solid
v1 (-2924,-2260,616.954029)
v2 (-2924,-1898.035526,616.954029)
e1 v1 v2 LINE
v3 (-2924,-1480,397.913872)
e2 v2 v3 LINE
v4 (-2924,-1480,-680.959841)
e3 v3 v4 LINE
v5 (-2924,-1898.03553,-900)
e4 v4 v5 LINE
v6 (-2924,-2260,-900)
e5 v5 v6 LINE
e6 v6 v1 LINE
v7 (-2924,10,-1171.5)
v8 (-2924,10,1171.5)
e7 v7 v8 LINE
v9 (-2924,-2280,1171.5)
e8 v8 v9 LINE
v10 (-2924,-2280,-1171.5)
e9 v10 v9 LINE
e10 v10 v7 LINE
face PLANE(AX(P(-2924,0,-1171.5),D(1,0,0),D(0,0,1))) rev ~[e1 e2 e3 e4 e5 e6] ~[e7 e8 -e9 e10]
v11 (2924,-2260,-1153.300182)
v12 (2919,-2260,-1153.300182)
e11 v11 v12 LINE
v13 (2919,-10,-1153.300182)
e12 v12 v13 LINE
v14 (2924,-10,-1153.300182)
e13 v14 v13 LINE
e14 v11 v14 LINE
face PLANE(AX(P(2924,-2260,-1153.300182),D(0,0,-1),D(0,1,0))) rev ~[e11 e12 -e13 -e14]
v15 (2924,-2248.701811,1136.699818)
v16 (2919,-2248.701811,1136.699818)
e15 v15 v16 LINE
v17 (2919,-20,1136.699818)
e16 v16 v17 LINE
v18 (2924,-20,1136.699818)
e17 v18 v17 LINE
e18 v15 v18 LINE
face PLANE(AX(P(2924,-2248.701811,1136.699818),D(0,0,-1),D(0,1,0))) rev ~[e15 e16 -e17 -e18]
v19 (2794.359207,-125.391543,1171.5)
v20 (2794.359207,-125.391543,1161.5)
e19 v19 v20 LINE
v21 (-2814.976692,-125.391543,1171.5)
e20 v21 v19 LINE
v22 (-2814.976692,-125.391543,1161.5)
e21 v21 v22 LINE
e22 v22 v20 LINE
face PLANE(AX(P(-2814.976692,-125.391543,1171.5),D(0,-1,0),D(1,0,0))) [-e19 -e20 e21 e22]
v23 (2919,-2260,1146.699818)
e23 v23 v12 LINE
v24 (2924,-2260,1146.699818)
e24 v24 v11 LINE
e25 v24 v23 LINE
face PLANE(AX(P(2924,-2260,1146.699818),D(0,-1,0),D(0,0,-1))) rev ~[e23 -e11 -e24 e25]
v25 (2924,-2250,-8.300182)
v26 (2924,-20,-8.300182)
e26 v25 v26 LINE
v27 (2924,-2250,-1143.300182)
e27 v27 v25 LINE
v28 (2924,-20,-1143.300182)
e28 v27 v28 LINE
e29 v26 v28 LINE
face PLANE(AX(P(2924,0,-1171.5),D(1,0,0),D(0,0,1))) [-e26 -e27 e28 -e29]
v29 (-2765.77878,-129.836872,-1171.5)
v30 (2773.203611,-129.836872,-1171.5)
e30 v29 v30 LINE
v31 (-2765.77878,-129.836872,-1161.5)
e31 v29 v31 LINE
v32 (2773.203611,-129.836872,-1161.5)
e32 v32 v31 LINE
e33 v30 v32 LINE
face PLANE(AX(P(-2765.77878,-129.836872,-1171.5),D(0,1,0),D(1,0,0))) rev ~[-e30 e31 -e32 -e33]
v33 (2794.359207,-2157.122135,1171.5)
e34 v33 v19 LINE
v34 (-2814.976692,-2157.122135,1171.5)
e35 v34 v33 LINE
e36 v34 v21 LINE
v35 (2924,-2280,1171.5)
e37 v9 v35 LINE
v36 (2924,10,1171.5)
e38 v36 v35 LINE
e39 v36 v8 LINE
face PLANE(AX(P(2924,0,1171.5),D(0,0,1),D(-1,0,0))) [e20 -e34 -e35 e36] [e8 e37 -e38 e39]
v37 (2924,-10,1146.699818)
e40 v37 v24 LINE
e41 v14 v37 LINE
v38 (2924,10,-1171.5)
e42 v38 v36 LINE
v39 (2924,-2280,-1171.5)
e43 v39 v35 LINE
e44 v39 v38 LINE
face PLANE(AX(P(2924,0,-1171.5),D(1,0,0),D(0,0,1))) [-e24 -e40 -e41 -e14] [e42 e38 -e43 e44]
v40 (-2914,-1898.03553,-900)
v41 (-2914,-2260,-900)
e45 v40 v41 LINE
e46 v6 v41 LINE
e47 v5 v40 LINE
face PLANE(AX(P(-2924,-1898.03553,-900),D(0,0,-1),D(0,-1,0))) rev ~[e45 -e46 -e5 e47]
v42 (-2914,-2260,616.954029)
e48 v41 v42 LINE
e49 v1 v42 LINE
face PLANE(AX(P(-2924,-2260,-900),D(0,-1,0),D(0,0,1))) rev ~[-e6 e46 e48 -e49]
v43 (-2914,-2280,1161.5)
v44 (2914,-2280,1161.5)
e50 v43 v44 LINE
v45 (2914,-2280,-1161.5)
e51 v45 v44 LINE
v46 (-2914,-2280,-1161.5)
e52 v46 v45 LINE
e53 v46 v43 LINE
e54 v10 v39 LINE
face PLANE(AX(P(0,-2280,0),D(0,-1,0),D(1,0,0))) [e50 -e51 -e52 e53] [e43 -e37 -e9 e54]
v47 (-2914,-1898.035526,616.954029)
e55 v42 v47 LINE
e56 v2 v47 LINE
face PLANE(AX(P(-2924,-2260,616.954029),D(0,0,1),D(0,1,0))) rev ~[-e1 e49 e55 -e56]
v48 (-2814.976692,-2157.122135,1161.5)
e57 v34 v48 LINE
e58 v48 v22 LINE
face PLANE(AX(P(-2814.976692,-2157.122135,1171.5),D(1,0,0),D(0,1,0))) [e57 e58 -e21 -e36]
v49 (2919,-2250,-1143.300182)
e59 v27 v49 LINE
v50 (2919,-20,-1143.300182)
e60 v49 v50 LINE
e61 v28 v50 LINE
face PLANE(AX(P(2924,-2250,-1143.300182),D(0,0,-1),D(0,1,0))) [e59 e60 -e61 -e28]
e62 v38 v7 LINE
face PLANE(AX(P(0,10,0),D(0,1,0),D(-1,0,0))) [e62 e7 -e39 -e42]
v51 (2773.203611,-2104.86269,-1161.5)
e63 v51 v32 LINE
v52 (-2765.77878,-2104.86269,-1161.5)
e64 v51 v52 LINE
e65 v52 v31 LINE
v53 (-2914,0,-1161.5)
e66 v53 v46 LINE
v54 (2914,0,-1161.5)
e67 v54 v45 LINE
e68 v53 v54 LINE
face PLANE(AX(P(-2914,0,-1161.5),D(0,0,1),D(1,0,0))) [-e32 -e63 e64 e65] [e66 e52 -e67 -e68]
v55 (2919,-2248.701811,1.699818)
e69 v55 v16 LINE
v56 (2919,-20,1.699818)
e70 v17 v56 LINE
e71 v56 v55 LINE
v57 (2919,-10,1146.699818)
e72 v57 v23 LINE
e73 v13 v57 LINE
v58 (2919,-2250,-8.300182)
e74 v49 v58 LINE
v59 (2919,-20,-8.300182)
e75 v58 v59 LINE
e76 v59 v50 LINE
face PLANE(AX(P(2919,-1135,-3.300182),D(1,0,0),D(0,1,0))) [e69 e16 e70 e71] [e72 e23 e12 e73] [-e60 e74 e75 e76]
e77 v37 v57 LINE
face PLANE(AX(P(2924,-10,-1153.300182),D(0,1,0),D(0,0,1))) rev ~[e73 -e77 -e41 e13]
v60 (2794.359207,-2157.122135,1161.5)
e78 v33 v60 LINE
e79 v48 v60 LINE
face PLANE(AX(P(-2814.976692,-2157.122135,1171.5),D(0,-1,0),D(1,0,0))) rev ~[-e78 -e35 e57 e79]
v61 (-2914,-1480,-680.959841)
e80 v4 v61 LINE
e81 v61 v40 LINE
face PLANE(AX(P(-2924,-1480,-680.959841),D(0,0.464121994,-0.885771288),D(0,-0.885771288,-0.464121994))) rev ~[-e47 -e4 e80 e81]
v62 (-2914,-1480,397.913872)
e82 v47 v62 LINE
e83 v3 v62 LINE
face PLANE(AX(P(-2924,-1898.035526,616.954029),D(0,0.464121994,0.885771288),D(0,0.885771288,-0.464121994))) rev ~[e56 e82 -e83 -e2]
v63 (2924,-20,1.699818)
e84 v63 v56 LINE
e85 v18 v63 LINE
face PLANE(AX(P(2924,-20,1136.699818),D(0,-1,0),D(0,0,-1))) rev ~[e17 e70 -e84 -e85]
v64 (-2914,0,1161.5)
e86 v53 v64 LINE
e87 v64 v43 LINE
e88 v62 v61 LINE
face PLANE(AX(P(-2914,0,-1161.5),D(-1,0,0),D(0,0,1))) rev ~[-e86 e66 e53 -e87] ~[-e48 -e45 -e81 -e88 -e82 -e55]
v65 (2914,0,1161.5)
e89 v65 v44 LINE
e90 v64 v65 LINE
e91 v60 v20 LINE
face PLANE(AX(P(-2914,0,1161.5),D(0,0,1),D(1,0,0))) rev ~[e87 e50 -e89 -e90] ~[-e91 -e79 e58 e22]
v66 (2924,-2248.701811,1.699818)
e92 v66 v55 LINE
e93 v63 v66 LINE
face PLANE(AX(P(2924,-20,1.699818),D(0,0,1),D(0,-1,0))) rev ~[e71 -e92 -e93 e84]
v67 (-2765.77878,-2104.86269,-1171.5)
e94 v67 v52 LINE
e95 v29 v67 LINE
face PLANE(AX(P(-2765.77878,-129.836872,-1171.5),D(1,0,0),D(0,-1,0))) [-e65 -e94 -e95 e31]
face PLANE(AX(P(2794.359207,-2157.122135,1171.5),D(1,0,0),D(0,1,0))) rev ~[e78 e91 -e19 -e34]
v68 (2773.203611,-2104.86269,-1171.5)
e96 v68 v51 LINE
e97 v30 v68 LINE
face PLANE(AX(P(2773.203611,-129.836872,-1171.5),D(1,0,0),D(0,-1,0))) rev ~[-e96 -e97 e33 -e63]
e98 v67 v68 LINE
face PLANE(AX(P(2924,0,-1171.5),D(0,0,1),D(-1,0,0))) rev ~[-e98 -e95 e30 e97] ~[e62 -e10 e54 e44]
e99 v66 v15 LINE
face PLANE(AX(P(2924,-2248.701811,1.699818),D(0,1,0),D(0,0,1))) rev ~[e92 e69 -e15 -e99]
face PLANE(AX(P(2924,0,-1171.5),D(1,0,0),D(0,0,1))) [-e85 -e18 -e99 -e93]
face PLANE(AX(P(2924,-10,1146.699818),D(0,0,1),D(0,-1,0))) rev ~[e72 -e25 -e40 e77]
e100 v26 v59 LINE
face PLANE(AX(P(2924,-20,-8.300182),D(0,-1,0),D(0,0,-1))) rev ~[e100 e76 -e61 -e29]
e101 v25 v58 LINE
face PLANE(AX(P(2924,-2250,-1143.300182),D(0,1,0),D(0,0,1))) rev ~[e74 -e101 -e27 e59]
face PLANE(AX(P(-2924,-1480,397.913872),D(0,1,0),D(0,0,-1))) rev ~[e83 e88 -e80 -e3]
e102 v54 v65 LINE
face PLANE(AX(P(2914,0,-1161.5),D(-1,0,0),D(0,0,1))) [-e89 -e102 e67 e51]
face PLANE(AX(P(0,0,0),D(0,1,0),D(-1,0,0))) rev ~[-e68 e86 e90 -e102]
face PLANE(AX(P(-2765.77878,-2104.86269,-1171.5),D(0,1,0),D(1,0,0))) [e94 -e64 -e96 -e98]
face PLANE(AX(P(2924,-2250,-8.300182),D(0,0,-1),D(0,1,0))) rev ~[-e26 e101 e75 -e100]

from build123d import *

# Parameters (mm, degrees)
F0_W      = 5848
F0_H      = 2343
F0_W_2    = 5828
F0_H_2    = 2323
F1_DEPTH  = 2280
F2_W      = 5848
F2_H      = 2343
F2_W_2    = 5828
F2_H_2    = 2323
F3_DEPTH  = 10
F4_W      = 5538.9823913574
F4_H      = 1975.0258177519
F5_DEPTH  = 25
F7_DEPTH  = 25
F8_W      = 2228.7018108368
F8_H      = 10
F8_W_2    = 2230
F9_DEPTH  = 5
F10_W     = 5609.335899353
F10_H     = 2031.7305922508
F11_DEPTH = 25


# Not quite as in the source:
# - a feature names something its author has since deleted; it is built from what else it names


with BuildPart() as f1:
    # F0 (on Front) → F1 (new body)
    with BuildSketch(Plane.XZ):
        Rectangle(F0_W, F0_H)
        Rectangle(F0_W_2, F0_H_2, mode=Mode.SUBTRACT)
    extrude(amount=F1_DEPTH)

    # F2 (on face) → F3 (join)
    with BuildSketch(Plane(origin=(0, 0, 0), x_dir=(-1, 0, 0), z_dir=(0, 1, 0))):
        Rectangle(F2_W, F2_H)
        Rectangle(F2_W_2, F2_H_2, mode=Mode.SUBTRACT)
        Rectangle(F2_W_2, F2_H_2)
    extrude(amount=F3_DEPTH)

    # F4 (on face) → F5 (cut)
    with BuildSketch(Plane(origin=(0, 0, -1171.5), x_dir=(1, 0, 0), z_dir=(0, 0, -1))):
        with Locations((3.7124156952, 1117.349781096)):
            Rectangle(F4_W, F4_H)
    extrude(amount=-F5_DEPTH, mode=Mode.SUBTRACT)

    # F6 (on face) → F7 (cut)
    with BuildSketch(Plane(origin=(-2924, 0, 0), x_dir=(0, -1, 0), z_dir=(-1, 0, 0))):
        Polygon((2260, -900), (2260, 616.9540286064), (1898.0355262756, 616.9540286064), (1480, 397.9138715092), (1480, -680.9598410104), (1898.03553, -900), (2053.3208847046, -900), align=None)
    extrude(amount=-F7_DEPTH, mode=Mode.SUBTRACT)

    # F8 (on face) → F9 (cut)
    with BuildSketch(Plane.YZ.offset(2924)):
        Polygon((-2248.7018108368, 1.6998175904), (-2260, 1.6998175904), (-2260, -8.3001824096), (-2250, -8.3001824096), (-2248.7018108368, -8.3001824096), (-20, -8.3001824096), (-10, -8.3001824096), (-10, 1.6998175904), (-20, 1.6998175904), align=None)
        Polygon((-20, 1136.6998175904), (-20, 1.6998175904), (-10, 1.6998175904), (-10, 1146.6998175904), (-20, 1146.6998175904), align=None)
        with Locations((-1134.3509054184, 1141.6998175904)):
            Rectangle(F8_W, F8_H)
        Polygon((-2260, 1146.6998175904), (-2260, 1.6998175904), (-2248.7018108368, 1.6998175904), (-2248.7018108368, 1136.6998175904), (-2248.7018108368, 1146.6998175904), align=None)
        Polygon((-2250, -8.3001824096), (-2260, -8.3001824096), (-2260, -1153.3001824096), (-2250, -1153.3001824096), (-2250, -1143.3001824096), align=None)
        with Locations((-1135, -1148.3001824096)):
            Rectangle(F8_W_2, F8_H)
        Polygon((-10, -1153.3001824096), (-10, -8.3001824096), (-20, -8.3001824096), (-20, -1143.3001824096), (-20, -1153.3001824096), align=None)
    extrude(amount=-F9_DEPTH, mode=Mode.SUBTRACT)

    # F10 (on face) → F11 (cut)
    with BuildSketch(Plane.XY.offset(1171.5)):
        with Locations((-10.3087425232, -1141.2568390369)):
            Rectangle(F10_W, F10_H)
    extrude(amount=-F11_DEPTH, mode=Mode.SUBTRACT)


solid = f1.part
